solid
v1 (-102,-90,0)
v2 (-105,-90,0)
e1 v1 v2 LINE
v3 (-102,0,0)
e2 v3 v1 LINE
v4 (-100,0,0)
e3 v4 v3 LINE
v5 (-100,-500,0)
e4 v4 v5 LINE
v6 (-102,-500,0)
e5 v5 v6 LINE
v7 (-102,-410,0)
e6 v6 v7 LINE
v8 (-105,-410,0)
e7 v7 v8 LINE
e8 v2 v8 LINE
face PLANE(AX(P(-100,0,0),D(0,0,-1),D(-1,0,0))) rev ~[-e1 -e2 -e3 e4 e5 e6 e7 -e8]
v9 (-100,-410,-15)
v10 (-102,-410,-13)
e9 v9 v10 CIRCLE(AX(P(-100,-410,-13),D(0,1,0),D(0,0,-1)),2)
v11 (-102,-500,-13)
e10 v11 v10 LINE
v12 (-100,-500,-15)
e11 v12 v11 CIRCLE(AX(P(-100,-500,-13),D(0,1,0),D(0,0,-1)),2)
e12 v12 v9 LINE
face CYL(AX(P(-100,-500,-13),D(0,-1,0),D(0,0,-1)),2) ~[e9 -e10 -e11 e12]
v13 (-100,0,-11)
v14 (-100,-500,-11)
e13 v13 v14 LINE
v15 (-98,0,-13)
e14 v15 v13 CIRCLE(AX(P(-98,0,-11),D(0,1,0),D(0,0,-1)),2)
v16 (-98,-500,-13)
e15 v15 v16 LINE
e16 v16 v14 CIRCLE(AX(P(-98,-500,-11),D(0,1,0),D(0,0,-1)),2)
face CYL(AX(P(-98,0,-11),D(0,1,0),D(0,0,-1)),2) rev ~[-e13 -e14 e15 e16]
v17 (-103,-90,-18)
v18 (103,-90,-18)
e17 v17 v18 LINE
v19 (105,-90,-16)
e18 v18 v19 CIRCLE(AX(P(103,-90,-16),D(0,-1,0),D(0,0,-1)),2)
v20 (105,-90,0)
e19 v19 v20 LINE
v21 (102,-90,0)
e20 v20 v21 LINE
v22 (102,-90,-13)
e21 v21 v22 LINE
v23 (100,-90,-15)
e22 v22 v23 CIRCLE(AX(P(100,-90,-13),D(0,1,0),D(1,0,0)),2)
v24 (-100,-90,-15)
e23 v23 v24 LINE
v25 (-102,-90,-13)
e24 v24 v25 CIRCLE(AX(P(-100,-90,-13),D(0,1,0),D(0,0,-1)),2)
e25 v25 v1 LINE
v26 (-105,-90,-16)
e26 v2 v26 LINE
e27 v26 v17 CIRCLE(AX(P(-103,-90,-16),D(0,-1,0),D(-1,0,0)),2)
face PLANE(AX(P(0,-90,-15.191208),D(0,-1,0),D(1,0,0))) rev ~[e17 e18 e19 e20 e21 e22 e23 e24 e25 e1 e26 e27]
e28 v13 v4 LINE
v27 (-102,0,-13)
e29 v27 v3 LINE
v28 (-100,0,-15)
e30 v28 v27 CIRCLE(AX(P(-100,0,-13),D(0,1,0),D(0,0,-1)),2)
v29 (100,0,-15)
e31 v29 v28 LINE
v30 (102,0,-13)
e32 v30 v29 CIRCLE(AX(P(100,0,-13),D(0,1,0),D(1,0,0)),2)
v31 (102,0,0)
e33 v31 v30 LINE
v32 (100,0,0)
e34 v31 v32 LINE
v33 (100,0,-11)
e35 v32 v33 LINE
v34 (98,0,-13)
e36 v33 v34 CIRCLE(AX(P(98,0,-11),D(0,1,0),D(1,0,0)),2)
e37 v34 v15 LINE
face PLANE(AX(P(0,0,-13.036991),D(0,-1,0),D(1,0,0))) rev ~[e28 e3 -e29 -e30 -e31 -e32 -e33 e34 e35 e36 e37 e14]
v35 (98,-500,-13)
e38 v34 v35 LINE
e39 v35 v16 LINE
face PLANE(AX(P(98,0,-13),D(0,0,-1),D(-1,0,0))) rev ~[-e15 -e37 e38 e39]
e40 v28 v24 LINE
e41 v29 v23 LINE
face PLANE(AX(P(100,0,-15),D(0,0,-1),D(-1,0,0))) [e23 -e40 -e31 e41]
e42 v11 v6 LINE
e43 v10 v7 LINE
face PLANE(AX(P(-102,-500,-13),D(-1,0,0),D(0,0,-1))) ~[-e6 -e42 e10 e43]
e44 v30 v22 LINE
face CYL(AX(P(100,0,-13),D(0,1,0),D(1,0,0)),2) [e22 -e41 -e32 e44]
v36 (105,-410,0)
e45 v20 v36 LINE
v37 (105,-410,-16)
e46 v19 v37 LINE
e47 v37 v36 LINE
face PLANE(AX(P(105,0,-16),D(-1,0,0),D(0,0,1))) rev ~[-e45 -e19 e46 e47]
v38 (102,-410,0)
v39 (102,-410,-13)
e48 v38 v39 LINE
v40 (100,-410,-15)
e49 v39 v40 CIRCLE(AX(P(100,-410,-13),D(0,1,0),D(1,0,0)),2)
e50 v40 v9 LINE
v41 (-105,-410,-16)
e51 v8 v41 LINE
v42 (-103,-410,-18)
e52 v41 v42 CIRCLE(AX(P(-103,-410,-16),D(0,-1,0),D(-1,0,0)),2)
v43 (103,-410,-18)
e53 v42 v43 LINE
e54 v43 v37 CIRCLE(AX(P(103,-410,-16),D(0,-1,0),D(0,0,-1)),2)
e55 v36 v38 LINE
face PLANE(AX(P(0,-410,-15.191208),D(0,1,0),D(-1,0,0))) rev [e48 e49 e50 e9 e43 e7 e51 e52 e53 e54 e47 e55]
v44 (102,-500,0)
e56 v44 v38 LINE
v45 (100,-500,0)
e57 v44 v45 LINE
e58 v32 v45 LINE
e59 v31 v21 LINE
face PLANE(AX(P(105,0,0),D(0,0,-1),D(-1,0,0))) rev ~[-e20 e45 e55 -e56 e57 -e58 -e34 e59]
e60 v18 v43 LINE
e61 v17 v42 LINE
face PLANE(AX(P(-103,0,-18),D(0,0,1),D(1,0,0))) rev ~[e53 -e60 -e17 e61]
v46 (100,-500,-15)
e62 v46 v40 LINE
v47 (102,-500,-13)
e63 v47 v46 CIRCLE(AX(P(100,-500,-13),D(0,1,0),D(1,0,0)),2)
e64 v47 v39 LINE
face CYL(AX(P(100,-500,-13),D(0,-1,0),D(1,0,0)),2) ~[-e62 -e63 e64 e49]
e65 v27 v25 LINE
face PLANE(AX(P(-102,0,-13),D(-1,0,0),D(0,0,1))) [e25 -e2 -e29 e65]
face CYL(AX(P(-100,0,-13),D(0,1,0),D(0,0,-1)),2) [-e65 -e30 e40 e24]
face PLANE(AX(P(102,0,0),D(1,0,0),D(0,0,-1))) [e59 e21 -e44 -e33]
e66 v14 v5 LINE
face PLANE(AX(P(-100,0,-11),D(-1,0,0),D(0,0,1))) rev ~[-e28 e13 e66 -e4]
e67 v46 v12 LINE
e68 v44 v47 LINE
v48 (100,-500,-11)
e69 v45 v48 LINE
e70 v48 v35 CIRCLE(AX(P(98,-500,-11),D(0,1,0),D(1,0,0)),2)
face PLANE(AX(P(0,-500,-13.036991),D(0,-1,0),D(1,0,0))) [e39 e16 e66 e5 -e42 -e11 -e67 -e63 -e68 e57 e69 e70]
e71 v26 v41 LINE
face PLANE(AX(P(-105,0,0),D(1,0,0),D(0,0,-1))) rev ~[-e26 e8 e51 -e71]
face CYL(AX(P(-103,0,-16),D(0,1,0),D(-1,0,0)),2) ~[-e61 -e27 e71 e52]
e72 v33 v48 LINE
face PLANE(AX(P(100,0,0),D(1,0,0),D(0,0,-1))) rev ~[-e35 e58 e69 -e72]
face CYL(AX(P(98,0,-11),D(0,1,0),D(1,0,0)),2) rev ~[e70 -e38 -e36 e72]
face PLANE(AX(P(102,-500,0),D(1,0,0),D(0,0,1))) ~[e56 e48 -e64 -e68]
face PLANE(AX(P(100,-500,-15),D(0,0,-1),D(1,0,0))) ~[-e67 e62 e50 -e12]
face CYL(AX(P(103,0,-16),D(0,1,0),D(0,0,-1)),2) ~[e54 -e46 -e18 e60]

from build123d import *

# Parameters (mm, degrees)
F1_DEPTH = 500
F2_DEPTH = 90


# Not quite as in the source:
# - a pattern or mirror of a feature is missing from the dataset's text; its kind, count and spacing are read off the source's solid


with BuildPart() as f1:
    # F0 (on Front) → F1 (new body)
    with BuildSketch(Plane.XZ):
        with BuildLine():
            Line((102, 0), (100, 0))
            Line((100, 0), (100, -11))
            ThreePointArc((100, -11), (99.4142135624, -12.4142135624), (98, -13))
            Line((98, -13), (0, -13))
            Line((0, -13), (-98, -13))
            ThreePointArc((-98, -13), (-99.4142135624, -12.4142135624), (-100, -11))
            Line((-100, -11), (-100, 0))
            Line((-100, 0), (-102, 0))
            Line((-102, 0), (-102, -13))
            ThreePointArc((-102, -13), (-101.4142135624, -14.4142135624), (-100, -15))
            Line((-100, -15), (100, -15))
            ThreePointArc((100, -15), (101.4142135624, -14.4142135624), (102, -13))
            Line((102, -13), (102, 0))
        make_face()
        with BuildLine():
            Line((105, 0), (102, 0))
            Line((102, 0), (102, -13))
            ThreePointArc((102, -13), (101.4142135624, -14.4142135624), (100, -15))
            Line((100, -15), (-100, -15))
            ThreePointArc((-100, -15), (-101.4142135624, -14.4142135624), (-102, -13))
            Line((-102, -13), (-102, 0))
            Line((-102, 0), (-105, 0))
            Line((-105, 0), (-105, -16))
            ThreePointArc((-105, -16), (-104.4142135624, -17.4142135624), (-103, -18))
            Line((-103, -18), (0, -18))
            Line((0, -18), (103, -18))
            ThreePointArc((103, -18), (104.4142135624, -17.4142135624), (105, -16))
            Line((105, -16), (105, 0))
        make_face()
    extrude(amount=F1_DEPTH)

    # F0 (on Front) → F2 (cut)
    with BuildSketch(Plane.XZ):
        with BuildLine():
            Line((105, 0), (102, 0))
            Line((102, 0), (102, -13))
            ThreePointArc((102, -13), (101.4142135624, -14.4142135624), (100, -15))
            Line((100, -15), (-100, -15))
            ThreePointArc((-100, -15), (-101.4142135624, -14.4142135624), (-102, -13))
            Line((-102, -13), (-102, 0))
            Line((-102, 0), (-105, 0))
            Line((-105, 0), (-105, -16))
            ThreePointArc((-105, -16), (-104.4142135624, -17.4142135624), (-103, -18))
            Line((-103, -18), (0, -18))
            Line((0, -18), (103, -18))
            ThreePointArc((103, -18), (104.4142135624, -17.4142135624), (105, -16))
            Line((105, -16), (105, 0))
        make_face()
    f2 = extrude(amount=F2_DEPTH, mode=Mode.SUBTRACT)

    # F2_copies: F2 across plane
    add(f2.mirror(Plane(origin=(0, -250, 0), x_dir=(0, 0, -1), z_dir=(0, -1, 0))), mode=Mode.SUBTRACT)


solid = f1.part
